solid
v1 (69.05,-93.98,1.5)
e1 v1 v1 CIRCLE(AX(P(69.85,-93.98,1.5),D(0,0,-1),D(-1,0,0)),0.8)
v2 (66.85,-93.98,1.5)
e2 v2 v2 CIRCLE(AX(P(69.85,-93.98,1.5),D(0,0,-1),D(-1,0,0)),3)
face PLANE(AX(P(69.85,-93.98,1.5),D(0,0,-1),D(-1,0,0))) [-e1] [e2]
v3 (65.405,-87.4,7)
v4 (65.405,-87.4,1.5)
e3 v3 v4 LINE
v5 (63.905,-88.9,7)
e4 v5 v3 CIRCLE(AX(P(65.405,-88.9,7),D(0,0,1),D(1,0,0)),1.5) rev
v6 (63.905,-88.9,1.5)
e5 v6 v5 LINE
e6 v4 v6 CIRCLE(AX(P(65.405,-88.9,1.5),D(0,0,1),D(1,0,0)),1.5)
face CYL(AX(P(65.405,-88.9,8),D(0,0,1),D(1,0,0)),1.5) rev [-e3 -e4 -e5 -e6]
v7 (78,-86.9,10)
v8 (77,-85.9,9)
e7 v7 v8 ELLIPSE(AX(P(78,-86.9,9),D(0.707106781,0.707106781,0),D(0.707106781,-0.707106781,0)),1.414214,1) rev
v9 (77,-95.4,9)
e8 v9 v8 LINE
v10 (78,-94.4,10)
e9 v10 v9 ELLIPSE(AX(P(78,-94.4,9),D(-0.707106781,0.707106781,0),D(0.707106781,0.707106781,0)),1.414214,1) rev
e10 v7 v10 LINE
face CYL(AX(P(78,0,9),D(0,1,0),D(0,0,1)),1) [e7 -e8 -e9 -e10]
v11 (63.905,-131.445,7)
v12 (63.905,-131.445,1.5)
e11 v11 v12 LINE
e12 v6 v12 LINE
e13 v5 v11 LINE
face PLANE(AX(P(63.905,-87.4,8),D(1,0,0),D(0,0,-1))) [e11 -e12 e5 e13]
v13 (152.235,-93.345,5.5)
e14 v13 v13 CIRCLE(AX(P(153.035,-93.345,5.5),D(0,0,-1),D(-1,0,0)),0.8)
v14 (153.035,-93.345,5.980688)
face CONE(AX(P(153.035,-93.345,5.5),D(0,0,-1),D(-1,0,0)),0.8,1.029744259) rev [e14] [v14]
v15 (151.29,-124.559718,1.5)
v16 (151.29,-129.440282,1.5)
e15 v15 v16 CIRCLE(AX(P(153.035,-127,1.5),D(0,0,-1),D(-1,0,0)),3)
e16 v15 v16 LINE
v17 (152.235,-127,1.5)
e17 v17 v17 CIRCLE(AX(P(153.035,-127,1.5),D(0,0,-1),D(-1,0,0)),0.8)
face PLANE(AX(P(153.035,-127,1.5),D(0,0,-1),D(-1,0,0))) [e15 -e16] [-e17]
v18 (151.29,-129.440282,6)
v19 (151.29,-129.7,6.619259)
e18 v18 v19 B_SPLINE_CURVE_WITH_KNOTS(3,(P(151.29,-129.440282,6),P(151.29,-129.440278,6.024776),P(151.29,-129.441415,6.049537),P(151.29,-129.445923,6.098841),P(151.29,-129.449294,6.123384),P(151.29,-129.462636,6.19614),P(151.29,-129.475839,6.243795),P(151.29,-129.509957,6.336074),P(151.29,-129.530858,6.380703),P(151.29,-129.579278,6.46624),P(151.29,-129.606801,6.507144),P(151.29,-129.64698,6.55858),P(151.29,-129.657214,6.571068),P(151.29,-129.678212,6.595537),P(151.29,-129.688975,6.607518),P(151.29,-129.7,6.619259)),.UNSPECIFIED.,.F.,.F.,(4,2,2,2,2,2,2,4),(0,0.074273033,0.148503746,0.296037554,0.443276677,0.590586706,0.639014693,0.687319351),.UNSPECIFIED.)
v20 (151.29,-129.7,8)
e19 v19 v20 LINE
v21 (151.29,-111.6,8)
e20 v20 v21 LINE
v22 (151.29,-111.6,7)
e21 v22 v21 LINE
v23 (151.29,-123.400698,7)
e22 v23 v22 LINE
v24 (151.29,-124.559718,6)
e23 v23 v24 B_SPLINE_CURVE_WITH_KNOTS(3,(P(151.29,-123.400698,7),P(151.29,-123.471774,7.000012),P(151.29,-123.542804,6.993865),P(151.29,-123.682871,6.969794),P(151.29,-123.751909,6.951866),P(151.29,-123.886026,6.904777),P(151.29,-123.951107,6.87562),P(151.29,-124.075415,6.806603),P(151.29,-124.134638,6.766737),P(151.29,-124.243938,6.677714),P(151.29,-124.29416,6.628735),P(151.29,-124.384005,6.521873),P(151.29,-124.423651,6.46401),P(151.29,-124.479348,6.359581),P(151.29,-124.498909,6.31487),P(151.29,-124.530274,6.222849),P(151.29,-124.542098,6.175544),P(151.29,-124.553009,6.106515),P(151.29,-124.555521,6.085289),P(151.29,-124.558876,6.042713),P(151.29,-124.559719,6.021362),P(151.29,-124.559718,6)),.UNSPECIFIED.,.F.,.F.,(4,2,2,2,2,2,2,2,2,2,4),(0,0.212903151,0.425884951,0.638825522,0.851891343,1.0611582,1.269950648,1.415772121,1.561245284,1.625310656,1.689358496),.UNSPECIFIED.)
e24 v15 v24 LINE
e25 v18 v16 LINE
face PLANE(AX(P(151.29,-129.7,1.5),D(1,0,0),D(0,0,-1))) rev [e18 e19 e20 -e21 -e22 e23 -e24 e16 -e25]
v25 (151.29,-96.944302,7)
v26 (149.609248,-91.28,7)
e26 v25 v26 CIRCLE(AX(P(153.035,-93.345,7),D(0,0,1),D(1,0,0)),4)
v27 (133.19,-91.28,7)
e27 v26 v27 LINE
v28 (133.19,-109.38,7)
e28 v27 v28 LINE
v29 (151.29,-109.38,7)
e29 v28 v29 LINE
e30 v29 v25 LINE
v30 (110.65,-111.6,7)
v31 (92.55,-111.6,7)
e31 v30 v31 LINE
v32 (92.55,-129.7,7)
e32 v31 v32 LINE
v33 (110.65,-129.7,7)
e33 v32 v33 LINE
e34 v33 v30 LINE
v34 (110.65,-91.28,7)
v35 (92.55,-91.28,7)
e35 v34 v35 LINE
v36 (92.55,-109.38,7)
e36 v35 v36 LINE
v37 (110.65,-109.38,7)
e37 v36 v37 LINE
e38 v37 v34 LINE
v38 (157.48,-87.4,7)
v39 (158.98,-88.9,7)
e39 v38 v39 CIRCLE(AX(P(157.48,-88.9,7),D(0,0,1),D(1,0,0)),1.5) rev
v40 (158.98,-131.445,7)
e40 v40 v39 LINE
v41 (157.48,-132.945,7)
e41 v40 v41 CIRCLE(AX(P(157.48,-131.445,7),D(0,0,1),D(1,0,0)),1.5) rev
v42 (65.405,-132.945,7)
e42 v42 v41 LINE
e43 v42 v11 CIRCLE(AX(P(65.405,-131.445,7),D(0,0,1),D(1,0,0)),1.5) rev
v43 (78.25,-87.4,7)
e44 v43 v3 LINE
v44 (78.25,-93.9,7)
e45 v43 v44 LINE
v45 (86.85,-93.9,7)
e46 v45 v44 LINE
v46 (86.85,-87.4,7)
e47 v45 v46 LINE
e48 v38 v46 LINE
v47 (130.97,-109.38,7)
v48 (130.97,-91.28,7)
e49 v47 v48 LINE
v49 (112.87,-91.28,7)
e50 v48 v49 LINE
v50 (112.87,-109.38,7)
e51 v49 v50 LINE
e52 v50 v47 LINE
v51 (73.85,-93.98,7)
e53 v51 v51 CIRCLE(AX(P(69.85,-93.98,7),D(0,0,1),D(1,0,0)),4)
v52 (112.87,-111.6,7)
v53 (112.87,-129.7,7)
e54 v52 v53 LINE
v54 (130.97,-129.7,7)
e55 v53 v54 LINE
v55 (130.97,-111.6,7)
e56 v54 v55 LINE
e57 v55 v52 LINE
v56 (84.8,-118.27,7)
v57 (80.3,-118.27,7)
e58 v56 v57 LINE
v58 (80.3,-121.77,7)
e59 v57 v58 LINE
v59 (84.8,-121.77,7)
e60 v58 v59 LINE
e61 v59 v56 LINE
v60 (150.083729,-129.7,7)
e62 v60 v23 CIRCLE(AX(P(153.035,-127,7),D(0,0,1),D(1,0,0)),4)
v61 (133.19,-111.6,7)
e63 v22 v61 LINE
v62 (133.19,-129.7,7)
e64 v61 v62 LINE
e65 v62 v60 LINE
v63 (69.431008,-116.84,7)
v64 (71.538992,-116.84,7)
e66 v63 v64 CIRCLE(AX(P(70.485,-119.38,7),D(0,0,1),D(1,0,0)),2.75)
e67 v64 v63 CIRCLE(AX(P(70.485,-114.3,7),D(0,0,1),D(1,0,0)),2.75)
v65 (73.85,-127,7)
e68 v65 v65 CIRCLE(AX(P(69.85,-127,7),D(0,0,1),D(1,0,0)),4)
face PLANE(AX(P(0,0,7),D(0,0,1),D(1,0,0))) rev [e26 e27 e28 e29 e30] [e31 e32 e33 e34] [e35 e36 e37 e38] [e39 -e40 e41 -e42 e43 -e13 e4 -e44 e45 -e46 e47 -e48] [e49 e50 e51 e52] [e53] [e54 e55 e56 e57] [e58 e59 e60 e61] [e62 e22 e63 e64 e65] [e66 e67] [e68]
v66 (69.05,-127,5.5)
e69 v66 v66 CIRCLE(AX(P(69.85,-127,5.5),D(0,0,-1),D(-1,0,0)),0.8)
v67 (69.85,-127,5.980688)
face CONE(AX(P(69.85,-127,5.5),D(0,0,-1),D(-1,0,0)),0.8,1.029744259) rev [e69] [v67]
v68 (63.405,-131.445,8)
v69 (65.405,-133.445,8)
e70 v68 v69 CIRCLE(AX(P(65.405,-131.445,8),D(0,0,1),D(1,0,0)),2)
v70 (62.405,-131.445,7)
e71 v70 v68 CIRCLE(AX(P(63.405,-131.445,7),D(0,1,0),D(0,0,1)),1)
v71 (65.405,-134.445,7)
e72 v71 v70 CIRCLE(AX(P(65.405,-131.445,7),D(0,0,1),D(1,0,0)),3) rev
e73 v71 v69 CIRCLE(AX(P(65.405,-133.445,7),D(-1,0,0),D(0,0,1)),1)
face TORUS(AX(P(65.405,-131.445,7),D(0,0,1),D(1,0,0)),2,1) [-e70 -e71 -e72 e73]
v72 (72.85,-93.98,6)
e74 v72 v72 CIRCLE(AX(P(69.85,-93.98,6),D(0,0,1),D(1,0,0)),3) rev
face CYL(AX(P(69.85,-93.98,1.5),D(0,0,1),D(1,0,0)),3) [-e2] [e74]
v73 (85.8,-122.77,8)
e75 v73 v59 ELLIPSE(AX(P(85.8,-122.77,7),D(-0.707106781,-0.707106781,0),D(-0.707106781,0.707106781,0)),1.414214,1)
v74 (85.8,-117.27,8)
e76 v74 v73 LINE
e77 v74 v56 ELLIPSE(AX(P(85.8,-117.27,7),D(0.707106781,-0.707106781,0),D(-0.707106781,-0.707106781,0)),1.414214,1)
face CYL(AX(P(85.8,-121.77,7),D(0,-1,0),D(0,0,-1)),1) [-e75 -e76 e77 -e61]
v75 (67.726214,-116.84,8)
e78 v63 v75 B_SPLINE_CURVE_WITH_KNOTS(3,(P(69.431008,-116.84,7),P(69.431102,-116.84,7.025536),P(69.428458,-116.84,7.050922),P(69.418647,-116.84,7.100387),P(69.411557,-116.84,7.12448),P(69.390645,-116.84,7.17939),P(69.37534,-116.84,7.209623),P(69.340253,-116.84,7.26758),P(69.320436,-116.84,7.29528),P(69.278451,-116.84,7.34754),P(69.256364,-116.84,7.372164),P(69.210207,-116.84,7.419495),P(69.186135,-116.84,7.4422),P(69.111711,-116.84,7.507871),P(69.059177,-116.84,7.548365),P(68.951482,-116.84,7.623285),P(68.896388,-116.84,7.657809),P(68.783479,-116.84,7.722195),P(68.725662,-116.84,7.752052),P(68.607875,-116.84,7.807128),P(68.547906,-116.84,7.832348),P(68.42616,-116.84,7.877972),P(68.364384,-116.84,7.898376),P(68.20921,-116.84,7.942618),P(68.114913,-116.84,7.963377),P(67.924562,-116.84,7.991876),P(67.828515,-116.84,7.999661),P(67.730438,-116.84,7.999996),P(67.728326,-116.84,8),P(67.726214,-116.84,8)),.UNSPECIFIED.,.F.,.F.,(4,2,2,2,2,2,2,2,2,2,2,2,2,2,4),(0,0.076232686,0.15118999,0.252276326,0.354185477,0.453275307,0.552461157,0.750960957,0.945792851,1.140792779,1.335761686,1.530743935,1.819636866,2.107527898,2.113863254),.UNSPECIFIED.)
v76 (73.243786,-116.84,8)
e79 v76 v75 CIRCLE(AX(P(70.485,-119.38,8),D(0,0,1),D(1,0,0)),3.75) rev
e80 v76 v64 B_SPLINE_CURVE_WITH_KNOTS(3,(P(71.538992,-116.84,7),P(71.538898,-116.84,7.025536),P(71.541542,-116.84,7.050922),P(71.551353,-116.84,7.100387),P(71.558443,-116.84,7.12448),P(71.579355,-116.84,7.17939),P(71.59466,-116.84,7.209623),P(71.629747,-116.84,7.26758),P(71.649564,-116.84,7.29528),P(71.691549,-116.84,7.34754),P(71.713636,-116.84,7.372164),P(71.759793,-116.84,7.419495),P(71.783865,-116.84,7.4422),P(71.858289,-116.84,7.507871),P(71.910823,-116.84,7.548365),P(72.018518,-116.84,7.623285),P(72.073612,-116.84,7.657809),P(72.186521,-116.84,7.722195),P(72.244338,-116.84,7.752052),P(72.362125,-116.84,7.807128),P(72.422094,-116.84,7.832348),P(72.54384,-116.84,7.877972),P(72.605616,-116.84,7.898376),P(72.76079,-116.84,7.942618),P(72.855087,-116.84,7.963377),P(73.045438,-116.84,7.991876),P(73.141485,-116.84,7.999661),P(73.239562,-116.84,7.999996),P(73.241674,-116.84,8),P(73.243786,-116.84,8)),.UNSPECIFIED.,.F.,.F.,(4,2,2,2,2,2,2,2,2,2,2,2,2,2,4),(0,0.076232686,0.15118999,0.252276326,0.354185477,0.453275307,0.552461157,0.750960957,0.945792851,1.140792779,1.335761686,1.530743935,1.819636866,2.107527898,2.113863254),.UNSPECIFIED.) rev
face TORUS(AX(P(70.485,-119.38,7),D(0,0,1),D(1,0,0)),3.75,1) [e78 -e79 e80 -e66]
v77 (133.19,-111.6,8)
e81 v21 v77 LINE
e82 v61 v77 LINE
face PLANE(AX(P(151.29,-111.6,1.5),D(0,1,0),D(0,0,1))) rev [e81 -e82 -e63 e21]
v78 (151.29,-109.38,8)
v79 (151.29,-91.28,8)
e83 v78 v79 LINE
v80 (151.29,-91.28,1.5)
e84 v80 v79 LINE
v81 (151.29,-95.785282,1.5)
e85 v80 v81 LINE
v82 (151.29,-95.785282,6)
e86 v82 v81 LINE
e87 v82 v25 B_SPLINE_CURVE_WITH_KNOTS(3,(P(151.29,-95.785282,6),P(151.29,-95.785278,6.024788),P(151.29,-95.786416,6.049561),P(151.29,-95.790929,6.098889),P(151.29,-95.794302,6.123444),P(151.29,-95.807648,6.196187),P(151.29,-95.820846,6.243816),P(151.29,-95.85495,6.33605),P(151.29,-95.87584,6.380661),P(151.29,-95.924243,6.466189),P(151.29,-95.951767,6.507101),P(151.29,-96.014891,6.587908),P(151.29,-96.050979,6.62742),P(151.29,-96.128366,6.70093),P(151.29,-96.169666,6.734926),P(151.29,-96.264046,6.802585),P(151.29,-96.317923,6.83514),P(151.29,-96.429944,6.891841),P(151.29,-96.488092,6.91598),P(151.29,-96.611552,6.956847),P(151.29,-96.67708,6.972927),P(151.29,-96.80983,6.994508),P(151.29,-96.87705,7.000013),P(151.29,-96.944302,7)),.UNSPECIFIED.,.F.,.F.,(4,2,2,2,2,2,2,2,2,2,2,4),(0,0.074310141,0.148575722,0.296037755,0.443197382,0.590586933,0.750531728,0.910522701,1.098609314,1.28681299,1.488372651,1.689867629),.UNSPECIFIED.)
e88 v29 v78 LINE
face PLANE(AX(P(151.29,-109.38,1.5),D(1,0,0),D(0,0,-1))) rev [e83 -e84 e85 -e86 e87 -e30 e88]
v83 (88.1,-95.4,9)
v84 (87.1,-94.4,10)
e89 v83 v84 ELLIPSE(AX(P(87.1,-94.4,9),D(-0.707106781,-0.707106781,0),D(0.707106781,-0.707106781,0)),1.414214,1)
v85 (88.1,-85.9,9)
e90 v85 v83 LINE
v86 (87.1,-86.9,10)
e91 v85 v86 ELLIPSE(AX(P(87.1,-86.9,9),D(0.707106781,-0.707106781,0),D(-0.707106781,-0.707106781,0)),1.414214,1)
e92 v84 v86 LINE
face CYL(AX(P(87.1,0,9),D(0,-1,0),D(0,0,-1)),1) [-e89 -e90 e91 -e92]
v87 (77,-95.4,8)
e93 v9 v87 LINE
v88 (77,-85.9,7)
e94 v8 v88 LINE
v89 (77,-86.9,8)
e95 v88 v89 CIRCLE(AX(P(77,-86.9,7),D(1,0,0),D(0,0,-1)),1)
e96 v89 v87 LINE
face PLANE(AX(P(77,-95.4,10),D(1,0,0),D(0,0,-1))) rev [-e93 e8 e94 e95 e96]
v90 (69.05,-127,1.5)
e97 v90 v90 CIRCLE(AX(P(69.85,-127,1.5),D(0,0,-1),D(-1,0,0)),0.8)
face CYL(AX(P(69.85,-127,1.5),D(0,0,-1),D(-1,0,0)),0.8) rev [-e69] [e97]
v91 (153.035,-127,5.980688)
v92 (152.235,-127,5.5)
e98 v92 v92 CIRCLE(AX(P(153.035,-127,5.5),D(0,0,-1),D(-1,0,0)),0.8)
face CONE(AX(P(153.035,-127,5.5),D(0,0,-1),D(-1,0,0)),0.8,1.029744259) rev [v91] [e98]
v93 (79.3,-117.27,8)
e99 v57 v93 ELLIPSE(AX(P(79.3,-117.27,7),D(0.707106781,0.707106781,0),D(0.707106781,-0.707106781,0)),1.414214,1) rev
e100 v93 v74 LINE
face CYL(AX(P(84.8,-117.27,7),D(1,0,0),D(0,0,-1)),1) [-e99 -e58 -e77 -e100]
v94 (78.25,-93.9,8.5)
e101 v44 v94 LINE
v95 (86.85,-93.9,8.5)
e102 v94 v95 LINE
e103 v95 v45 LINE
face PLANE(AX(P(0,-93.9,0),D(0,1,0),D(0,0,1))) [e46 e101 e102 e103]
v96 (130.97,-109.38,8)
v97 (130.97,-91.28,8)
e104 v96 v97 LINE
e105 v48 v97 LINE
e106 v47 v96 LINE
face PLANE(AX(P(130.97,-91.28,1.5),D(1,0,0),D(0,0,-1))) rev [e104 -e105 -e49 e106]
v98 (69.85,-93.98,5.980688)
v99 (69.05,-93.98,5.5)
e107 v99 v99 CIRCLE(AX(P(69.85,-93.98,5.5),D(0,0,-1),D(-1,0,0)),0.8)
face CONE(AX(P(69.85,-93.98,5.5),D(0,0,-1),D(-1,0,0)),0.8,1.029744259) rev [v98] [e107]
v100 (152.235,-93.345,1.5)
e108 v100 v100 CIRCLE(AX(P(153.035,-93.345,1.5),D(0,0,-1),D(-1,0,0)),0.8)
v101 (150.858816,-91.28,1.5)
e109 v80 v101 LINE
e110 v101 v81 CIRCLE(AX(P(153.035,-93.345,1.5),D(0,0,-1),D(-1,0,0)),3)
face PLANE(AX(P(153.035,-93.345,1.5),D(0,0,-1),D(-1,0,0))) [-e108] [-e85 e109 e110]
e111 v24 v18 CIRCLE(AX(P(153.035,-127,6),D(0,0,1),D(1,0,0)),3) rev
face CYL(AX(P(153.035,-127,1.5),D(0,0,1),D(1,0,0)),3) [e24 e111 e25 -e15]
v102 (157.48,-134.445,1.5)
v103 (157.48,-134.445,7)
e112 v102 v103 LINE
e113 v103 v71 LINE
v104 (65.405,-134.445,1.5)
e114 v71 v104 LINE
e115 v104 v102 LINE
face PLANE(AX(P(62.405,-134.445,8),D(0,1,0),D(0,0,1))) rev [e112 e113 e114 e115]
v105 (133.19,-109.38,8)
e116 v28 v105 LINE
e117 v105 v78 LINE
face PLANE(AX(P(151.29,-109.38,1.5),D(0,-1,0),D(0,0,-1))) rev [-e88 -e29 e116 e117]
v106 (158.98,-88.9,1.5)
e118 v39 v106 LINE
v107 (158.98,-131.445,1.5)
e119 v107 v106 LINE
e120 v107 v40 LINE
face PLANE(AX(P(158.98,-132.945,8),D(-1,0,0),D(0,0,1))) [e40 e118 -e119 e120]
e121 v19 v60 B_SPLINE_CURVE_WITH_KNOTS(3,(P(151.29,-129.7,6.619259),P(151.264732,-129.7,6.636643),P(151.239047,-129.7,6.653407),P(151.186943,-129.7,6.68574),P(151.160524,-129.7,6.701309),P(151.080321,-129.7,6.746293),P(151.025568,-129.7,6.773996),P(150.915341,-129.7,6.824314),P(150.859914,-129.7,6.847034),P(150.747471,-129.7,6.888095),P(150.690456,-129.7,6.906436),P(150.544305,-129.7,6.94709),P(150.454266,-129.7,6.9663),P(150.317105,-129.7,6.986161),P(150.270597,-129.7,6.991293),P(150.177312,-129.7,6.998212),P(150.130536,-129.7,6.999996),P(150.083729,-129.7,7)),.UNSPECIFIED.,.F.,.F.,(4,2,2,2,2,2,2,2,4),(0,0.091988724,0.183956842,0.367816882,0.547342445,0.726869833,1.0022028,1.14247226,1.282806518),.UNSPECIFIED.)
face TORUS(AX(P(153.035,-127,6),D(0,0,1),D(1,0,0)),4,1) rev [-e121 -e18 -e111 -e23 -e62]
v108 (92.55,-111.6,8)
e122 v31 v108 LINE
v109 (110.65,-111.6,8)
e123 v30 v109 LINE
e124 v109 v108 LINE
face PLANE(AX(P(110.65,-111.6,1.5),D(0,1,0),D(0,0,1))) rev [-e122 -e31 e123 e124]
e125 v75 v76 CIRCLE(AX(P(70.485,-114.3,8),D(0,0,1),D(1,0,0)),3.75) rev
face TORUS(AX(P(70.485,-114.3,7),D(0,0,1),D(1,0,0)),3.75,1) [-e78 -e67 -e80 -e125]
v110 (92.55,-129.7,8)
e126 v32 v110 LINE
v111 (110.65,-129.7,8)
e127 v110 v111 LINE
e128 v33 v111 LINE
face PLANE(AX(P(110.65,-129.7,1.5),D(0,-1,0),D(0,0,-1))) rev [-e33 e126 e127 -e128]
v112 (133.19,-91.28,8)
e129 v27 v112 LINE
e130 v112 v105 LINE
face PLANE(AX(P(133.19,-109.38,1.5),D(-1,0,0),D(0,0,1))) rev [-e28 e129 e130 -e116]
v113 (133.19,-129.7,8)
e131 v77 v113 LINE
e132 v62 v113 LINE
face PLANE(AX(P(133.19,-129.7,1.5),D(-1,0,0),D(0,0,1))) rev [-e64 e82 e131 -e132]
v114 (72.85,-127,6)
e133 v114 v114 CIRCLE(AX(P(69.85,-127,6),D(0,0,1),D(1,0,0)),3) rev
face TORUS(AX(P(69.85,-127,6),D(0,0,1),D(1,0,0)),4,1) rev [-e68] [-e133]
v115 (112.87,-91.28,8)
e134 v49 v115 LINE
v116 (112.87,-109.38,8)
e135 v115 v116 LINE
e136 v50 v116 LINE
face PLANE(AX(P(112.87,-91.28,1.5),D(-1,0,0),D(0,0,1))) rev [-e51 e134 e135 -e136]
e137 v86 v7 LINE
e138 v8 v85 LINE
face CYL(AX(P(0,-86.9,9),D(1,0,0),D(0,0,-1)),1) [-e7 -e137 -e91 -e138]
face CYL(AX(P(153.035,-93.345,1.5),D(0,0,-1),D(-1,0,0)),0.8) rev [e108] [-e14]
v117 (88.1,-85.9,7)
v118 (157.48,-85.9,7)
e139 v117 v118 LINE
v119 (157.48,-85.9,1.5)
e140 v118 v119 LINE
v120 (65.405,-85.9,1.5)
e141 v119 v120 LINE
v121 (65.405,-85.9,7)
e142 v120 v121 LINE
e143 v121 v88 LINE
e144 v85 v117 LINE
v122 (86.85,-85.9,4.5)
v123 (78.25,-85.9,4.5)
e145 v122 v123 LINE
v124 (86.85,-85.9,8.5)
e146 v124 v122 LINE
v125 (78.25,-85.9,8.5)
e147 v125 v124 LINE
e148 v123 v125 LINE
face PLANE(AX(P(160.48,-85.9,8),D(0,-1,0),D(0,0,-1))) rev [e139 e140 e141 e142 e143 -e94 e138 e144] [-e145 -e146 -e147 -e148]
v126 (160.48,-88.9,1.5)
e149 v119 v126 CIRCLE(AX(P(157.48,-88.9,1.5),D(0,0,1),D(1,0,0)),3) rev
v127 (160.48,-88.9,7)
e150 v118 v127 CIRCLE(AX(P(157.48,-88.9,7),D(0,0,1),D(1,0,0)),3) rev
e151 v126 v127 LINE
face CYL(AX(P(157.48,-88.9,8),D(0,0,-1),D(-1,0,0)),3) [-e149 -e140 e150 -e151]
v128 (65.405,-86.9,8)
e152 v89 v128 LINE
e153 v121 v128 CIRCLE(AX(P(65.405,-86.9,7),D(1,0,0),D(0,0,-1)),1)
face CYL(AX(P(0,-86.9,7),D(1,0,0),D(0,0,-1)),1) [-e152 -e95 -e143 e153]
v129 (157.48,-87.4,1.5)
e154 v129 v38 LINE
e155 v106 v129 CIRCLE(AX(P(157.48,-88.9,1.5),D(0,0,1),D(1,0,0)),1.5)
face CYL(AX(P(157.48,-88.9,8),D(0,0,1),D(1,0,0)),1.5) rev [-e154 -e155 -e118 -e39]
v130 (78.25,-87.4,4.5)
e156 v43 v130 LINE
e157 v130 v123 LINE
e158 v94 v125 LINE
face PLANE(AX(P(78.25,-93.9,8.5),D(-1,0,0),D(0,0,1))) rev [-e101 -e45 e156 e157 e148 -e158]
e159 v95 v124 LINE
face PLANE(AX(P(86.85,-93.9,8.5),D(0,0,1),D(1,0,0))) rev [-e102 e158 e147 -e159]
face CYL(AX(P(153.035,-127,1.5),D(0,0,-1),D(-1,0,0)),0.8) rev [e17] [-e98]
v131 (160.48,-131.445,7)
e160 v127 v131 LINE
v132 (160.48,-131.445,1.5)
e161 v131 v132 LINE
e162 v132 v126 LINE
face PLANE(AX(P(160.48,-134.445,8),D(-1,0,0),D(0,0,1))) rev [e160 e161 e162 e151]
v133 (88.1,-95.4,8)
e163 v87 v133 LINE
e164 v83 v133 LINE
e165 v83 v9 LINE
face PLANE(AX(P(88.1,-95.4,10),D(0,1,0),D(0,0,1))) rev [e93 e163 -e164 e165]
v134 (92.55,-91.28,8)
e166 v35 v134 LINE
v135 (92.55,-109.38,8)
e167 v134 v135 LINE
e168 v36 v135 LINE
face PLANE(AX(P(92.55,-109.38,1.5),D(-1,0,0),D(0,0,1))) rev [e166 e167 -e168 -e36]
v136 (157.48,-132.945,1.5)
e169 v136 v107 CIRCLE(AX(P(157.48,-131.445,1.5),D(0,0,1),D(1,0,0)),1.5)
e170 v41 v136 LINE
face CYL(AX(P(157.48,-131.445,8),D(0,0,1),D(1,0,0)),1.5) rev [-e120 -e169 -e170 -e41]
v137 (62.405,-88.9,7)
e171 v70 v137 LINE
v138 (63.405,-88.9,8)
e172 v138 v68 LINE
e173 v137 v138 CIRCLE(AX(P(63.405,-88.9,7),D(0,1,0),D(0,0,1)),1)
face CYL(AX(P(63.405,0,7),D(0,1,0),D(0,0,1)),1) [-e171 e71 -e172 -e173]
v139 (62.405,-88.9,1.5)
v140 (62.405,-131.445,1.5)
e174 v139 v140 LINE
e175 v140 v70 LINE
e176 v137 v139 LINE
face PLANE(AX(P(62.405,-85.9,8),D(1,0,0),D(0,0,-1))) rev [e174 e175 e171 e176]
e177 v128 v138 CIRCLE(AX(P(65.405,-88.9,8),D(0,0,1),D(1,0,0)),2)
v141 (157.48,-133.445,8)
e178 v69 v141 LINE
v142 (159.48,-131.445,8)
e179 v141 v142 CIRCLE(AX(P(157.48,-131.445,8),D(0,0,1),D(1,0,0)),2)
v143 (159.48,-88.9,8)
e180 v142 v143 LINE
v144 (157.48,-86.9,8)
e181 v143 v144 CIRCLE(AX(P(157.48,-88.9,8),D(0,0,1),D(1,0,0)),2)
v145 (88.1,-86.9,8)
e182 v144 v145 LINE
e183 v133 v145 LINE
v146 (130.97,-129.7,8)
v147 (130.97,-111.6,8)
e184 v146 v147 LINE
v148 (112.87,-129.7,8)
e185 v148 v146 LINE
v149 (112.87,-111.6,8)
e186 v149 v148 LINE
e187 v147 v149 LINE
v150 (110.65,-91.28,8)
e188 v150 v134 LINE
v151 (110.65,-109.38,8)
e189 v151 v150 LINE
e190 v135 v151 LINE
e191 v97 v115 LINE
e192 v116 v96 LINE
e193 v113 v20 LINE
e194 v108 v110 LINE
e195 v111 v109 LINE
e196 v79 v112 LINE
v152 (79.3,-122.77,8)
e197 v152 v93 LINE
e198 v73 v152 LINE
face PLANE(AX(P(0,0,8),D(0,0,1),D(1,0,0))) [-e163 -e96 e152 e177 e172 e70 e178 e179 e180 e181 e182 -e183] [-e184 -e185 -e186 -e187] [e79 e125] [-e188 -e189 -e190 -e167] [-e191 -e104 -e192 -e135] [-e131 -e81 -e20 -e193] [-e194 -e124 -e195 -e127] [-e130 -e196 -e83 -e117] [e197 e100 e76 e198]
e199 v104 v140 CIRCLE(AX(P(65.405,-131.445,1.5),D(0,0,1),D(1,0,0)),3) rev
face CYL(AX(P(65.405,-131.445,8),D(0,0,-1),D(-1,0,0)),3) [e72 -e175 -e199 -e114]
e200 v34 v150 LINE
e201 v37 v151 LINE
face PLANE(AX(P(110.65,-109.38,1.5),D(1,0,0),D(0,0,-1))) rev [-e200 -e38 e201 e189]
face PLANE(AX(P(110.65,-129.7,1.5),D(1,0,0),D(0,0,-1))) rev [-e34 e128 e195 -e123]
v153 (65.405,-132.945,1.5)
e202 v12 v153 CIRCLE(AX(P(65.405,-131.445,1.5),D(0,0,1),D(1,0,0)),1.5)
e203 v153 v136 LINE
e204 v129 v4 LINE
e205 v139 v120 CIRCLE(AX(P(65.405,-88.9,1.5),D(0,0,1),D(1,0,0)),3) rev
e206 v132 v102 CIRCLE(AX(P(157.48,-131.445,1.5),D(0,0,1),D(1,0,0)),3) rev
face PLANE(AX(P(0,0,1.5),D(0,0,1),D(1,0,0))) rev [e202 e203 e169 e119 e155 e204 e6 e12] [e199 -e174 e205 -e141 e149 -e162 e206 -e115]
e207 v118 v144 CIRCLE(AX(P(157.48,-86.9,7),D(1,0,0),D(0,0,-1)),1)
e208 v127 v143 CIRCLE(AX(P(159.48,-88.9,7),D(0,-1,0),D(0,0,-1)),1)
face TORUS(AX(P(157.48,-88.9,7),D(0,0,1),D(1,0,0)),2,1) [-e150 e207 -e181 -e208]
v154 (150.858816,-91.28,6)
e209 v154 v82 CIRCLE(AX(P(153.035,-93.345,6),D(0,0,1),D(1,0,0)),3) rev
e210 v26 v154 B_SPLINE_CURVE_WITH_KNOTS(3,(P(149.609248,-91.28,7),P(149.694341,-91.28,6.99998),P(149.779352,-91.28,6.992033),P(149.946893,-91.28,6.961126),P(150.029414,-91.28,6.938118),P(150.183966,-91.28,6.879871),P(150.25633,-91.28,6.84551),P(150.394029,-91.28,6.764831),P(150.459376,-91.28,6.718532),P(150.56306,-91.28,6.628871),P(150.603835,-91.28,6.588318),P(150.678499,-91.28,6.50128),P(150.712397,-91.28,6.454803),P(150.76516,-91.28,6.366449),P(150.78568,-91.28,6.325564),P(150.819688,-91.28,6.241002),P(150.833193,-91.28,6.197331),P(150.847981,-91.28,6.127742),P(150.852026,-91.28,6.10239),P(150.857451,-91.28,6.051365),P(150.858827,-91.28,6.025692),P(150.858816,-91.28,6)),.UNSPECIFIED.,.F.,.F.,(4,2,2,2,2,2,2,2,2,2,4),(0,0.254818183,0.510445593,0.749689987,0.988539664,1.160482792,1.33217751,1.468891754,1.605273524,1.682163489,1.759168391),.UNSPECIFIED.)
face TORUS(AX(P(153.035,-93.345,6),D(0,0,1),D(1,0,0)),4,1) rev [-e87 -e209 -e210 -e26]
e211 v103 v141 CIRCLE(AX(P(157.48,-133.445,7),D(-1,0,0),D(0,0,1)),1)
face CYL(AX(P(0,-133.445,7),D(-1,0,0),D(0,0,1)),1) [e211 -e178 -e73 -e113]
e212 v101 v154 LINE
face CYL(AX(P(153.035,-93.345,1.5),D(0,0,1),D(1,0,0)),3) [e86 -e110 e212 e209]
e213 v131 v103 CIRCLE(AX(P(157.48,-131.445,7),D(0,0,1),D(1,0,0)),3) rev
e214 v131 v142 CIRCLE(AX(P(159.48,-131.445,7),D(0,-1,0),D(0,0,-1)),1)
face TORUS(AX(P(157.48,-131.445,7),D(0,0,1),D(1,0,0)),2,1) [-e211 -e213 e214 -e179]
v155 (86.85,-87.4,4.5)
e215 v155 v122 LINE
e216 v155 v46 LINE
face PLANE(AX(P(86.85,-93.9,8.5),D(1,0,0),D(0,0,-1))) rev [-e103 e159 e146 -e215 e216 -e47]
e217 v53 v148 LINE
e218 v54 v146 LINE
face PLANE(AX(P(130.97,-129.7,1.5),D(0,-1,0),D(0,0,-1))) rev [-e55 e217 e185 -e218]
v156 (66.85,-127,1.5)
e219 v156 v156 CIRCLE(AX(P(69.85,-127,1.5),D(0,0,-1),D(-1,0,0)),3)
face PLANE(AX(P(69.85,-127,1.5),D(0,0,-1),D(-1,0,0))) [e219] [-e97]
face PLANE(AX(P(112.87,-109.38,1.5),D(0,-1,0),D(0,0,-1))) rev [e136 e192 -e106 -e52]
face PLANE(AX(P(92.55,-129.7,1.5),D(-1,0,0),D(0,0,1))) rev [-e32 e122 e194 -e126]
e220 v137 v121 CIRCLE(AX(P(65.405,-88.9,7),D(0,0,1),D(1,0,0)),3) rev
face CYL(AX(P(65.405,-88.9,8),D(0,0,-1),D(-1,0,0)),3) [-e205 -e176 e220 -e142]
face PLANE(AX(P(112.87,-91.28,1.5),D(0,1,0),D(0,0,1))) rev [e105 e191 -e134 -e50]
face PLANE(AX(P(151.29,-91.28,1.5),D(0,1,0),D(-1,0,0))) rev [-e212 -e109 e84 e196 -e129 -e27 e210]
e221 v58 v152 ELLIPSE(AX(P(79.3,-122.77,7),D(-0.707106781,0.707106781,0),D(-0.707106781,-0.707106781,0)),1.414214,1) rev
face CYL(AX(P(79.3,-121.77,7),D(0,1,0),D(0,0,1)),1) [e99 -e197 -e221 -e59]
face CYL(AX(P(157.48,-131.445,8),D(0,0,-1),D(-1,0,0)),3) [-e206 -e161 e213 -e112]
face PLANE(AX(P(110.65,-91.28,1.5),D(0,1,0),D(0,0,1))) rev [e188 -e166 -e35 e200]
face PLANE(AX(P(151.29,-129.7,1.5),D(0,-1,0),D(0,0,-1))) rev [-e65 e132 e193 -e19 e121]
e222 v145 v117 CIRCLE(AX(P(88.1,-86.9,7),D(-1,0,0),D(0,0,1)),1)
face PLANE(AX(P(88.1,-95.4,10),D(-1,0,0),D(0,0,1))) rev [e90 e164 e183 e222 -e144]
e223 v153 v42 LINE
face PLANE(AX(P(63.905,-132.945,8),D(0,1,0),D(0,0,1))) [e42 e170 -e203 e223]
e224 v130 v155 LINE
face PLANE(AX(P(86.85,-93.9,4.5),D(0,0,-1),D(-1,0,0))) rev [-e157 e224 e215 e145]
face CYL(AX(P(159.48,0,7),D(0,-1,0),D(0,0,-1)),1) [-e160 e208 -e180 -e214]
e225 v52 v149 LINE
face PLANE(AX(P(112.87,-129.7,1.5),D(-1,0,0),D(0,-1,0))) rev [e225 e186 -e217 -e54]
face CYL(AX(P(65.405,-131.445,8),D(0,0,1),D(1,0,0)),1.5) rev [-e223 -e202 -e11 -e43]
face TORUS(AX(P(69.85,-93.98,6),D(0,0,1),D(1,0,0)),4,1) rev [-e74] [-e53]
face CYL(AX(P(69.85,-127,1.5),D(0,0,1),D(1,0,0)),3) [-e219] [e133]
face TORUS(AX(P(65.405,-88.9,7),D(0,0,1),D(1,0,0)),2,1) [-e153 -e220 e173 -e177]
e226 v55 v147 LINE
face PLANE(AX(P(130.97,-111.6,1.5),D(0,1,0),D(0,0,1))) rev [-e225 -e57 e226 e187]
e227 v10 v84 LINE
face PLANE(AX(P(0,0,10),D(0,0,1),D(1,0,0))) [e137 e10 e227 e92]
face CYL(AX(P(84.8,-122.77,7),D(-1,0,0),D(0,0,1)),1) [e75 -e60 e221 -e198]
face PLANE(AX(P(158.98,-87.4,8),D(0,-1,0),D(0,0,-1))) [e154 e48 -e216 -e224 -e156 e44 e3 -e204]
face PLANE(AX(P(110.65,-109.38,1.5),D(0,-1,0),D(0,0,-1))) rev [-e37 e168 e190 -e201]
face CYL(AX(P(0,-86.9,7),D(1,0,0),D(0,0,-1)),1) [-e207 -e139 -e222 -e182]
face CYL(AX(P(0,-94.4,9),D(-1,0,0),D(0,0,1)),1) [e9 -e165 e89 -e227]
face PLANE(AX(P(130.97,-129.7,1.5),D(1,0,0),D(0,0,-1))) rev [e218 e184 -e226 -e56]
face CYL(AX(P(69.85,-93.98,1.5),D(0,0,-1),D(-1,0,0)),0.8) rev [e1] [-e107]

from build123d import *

# Parameters (mm, degrees)
SKETCH3_W                 = 98.075
SKETCH3_H                 = 48.545
SKETCH3_W_2               = 95.075
SKETCH3_H_2               = 45.545
WALL_DEPTH                = 6.5
SKETCH4_W                 = 98.075
SKETCH4_H                 = 48.545
TOPFACE_DEPTH             = 1
SKETCH7_R                 = 3
STANDOFFS_DEPTH           = 5.5
M2X0_4_TAPPED_HOLE1_D     = 1.6
M2X0_4_TAPPED_HOLE1_DEPTH = 4
M2X0_4_TAPPED_HOLE1_TIP   = 0.480688495
SKETCH5_W                 = 18.1
SKETCH5_H                 = 18.1
SKETCH5_W_2               = 4.5
SKETCH5_H_2               = 3.5
KEYCUT_DEPTH              = 210.455337542
SKETCH9_W                 = 11.1
SKETCH9_H                 = 9.5
USBEXTRUDE_DEPTH          = 2
SKETCH12_W                = 8.6
SKETCH12_H                = 4
USBCUT_DEPTH              = 8
FILLETSIDE_R              = 3
FILLETSIDEINNER_R         = 1.5
FILLETTOP_R               = 1
FILLETTOPINNER_R          = 1


with BuildPart() as part:
    # Sketch3 → Wall (new body)
    with BuildSketch(Plane.XY.offset(1.5)):
        with Locations((111.4425, -110.1725)):
            Rectangle(SKETCH3_W, SKETCH3_H)
        with Locations((111.4425, -110.1725)):
            Rectangle(SKETCH3_W_2, SKETCH3_H_2, mode=Mode.SUBTRACT)
    extrude(amount=WALL_DEPTH)

    # Sketch4 → TopFace (add)
    with BuildSketch(Plane.XY.offset(8)):
        with Locations((111.4425, -110.1725)):
            Rectangle(SKETCH4_W, SKETCH4_H)
    extrude(amount=-TOPFACE_DEPTH)

    # Sketch7 → Standoffs (add)
    with BuildSketch(Plane(origin=(0, 0, 7), x_dir=(-1, 0, 0), z_dir=(0, 0, -1))):
        with Locations(Location((-153.035, -93.345, 0), (0, 0, 180))):
            Circle(SKETCH7_R)
        with Locations(Location((-69.85, -93.98, 0), (0, 0, 180))):
            Circle(SKETCH7_R)
        with Locations(Location((-69.85, -127, 0), (0, 0, 180))):
            Circle(SKETCH7_R)
        with Locations(Location((-153.035, -127, 0), (0, 0, 180))):
            Circle(SKETCH7_R)
    extrude(amount=STANDOFFS_DEPTH)

    # M2x0.4 Tapped Hole1
    with Locations(Plane(origin=(0, 0, 1.5), x_dir=(-1, 0, 0), z_dir=(0, 0, -1))):
        with Locations((-153.035, -93.345), (-69.85, -93.98), (-153.035, -127), (-69.85, -127)):
            Hole(M2X0_4_TAPPED_HOLE1_D / 2, depth=M2X0_4_TAPPED_HOLE1_DEPTH)
            with Locations((0, 0, -(M2X0_4_TAPPED_HOLE1_DEPTH + M2X0_4_TAPPED_HOLE1_TIP / 2))):  # 118° drill point
                Cone(0, M2X0_4_TAPPED_HOLE1_D / 2, M2X0_4_TAPPED_HOLE1_TIP, mode=Mode.SUBTRACT)

    # Sketch5 → KeyCut (cut, through all)
    with BuildSketch(Plane.XY.offset(8)):
        with Locations((142.24, -120.65)):
            Rectangle(SKETCH5_W, SKETCH5_H)
        with Locations((121.92, -120.65)):
            Rectangle(SKETCH5_W, SKETCH5_H)
        with Locations((101.6, -120.65)):
            Rectangle(SKETCH5_W, SKETCH5_H)
        with Locations((101.6, -100.33)):
            Rectangle(SKETCH5_W, SKETCH5_H)
        with Locations((142.24, -100.33)):
            Rectangle(SKETCH5_W, SKETCH5_H)
        with Locations((121.92, -100.33)):
            Rectangle(SKETCH5_W, SKETCH5_H)
        with Locations((82.55, -120.02)):
            Rectangle(SKETCH5_W_2, SKETCH5_H_2)
        with BuildLine():
            ThreePointArc((71.53899241, -116.84), (70.485, -111.55), (69.43100759, -116.84))
            ThreePointArc((69.43100759, -116.84), (70.485, -122.13), (71.53899241, -116.84))
        make_face()
    extrude(amount=-KEYCUT_DEPTH, mode=Mode.SUBTRACT)

    # Sketch9 → USBExtrude (add)
    with BuildSketch(Plane.XY.offset(8)):
        with Locations((82.55, -90.65)):
            Rectangle(SKETCH9_W, SKETCH9_H)
    extrude(amount=USBEXTRUDE_DEPTH)

    # Sketch12 → USBCut (cut)
    with BuildSketch(Plane(origin=(0, -85.9, 0), x_dir=(1, 0, 0), z_dir=(0, 1, 0))):
        with Locations((82.55, -6.5)):
            Rectangle(SKETCH12_W, SKETCH12_H)
    extrude(amount=-USBCUT_DEPTH, mode=Mode.SUBTRACT)

    # FilletSide
    filletside_edges = [part.edges().sort_by_distance(p)[0] for p in [
        (62.405, -134.445, 4.75),
        (62.405, -85.9, 4.75),
        (160.48, -85.9, 4.75),
        (160.48, -134.445, 4.75),
    ]]
    fillet(filletside_edges, radius=FILLETSIDE_R)

    # FilletSideInner
    filletsideinner_edges = [part.edges().sort_by_distance(p)[0] for p in [
        (63.905, -132.945, 4.25),
        (158.98, -132.945, 4.25),
        (63.905, -87.4, 4.25),
        (158.98, -87.4, 4.25),
    ]]
    fillet(filletsideinner_edges, radius=FILLETSIDEINNER_R)

    # FilletTop
    fillettop_edges = [part.edges().sort_by_distance(p)[0] for p in [
        (82.55, -95.4, 10),
        (77, -90.65, 10),
        (82.55, -85.9, 10),
        (88.1, -90.65, 10),
        (71.2025, -85.9, 8),
        (63.283679656, -86.778679656, 8),
        (62.405, -110.1725, 8),
        (63.283679656, -133.566320344, 8),
        (111.4425, -134.445, 8),
        (159.601320344, -133.566320344, 8),
        (160.48, -110.1725, 8),
        (159.601320344, -86.778679656, 8),
        (122.79, -85.9, 8),
        (82.55, -121.77, 8),
        (84.8, -120.02, 8),
        (82.55, -118.27, 8),
        (80.3, -120.02, 8),
        (70.485, -122.13, 8),
        (70.485, -111.55, 8),
    ]]
    fillet(fillettop_edges, radius=FILLETTOP_R - 0.0001)  # a hair under: the kernel refuses the full size

    # FilletTopInner
    fillettopinner_edges = [part.edges().sort_by_distance(p)[0] for p in [
        (156.021354145, -93.059187267, 7),
        (66.85, -93.98, 7),
        (66.85, -127, 7),
        (156.035, -127, 7),
    ]]
    fillet(fillettopinner_edges, radius=FILLETTOPINNER_R)


solid = part.part
